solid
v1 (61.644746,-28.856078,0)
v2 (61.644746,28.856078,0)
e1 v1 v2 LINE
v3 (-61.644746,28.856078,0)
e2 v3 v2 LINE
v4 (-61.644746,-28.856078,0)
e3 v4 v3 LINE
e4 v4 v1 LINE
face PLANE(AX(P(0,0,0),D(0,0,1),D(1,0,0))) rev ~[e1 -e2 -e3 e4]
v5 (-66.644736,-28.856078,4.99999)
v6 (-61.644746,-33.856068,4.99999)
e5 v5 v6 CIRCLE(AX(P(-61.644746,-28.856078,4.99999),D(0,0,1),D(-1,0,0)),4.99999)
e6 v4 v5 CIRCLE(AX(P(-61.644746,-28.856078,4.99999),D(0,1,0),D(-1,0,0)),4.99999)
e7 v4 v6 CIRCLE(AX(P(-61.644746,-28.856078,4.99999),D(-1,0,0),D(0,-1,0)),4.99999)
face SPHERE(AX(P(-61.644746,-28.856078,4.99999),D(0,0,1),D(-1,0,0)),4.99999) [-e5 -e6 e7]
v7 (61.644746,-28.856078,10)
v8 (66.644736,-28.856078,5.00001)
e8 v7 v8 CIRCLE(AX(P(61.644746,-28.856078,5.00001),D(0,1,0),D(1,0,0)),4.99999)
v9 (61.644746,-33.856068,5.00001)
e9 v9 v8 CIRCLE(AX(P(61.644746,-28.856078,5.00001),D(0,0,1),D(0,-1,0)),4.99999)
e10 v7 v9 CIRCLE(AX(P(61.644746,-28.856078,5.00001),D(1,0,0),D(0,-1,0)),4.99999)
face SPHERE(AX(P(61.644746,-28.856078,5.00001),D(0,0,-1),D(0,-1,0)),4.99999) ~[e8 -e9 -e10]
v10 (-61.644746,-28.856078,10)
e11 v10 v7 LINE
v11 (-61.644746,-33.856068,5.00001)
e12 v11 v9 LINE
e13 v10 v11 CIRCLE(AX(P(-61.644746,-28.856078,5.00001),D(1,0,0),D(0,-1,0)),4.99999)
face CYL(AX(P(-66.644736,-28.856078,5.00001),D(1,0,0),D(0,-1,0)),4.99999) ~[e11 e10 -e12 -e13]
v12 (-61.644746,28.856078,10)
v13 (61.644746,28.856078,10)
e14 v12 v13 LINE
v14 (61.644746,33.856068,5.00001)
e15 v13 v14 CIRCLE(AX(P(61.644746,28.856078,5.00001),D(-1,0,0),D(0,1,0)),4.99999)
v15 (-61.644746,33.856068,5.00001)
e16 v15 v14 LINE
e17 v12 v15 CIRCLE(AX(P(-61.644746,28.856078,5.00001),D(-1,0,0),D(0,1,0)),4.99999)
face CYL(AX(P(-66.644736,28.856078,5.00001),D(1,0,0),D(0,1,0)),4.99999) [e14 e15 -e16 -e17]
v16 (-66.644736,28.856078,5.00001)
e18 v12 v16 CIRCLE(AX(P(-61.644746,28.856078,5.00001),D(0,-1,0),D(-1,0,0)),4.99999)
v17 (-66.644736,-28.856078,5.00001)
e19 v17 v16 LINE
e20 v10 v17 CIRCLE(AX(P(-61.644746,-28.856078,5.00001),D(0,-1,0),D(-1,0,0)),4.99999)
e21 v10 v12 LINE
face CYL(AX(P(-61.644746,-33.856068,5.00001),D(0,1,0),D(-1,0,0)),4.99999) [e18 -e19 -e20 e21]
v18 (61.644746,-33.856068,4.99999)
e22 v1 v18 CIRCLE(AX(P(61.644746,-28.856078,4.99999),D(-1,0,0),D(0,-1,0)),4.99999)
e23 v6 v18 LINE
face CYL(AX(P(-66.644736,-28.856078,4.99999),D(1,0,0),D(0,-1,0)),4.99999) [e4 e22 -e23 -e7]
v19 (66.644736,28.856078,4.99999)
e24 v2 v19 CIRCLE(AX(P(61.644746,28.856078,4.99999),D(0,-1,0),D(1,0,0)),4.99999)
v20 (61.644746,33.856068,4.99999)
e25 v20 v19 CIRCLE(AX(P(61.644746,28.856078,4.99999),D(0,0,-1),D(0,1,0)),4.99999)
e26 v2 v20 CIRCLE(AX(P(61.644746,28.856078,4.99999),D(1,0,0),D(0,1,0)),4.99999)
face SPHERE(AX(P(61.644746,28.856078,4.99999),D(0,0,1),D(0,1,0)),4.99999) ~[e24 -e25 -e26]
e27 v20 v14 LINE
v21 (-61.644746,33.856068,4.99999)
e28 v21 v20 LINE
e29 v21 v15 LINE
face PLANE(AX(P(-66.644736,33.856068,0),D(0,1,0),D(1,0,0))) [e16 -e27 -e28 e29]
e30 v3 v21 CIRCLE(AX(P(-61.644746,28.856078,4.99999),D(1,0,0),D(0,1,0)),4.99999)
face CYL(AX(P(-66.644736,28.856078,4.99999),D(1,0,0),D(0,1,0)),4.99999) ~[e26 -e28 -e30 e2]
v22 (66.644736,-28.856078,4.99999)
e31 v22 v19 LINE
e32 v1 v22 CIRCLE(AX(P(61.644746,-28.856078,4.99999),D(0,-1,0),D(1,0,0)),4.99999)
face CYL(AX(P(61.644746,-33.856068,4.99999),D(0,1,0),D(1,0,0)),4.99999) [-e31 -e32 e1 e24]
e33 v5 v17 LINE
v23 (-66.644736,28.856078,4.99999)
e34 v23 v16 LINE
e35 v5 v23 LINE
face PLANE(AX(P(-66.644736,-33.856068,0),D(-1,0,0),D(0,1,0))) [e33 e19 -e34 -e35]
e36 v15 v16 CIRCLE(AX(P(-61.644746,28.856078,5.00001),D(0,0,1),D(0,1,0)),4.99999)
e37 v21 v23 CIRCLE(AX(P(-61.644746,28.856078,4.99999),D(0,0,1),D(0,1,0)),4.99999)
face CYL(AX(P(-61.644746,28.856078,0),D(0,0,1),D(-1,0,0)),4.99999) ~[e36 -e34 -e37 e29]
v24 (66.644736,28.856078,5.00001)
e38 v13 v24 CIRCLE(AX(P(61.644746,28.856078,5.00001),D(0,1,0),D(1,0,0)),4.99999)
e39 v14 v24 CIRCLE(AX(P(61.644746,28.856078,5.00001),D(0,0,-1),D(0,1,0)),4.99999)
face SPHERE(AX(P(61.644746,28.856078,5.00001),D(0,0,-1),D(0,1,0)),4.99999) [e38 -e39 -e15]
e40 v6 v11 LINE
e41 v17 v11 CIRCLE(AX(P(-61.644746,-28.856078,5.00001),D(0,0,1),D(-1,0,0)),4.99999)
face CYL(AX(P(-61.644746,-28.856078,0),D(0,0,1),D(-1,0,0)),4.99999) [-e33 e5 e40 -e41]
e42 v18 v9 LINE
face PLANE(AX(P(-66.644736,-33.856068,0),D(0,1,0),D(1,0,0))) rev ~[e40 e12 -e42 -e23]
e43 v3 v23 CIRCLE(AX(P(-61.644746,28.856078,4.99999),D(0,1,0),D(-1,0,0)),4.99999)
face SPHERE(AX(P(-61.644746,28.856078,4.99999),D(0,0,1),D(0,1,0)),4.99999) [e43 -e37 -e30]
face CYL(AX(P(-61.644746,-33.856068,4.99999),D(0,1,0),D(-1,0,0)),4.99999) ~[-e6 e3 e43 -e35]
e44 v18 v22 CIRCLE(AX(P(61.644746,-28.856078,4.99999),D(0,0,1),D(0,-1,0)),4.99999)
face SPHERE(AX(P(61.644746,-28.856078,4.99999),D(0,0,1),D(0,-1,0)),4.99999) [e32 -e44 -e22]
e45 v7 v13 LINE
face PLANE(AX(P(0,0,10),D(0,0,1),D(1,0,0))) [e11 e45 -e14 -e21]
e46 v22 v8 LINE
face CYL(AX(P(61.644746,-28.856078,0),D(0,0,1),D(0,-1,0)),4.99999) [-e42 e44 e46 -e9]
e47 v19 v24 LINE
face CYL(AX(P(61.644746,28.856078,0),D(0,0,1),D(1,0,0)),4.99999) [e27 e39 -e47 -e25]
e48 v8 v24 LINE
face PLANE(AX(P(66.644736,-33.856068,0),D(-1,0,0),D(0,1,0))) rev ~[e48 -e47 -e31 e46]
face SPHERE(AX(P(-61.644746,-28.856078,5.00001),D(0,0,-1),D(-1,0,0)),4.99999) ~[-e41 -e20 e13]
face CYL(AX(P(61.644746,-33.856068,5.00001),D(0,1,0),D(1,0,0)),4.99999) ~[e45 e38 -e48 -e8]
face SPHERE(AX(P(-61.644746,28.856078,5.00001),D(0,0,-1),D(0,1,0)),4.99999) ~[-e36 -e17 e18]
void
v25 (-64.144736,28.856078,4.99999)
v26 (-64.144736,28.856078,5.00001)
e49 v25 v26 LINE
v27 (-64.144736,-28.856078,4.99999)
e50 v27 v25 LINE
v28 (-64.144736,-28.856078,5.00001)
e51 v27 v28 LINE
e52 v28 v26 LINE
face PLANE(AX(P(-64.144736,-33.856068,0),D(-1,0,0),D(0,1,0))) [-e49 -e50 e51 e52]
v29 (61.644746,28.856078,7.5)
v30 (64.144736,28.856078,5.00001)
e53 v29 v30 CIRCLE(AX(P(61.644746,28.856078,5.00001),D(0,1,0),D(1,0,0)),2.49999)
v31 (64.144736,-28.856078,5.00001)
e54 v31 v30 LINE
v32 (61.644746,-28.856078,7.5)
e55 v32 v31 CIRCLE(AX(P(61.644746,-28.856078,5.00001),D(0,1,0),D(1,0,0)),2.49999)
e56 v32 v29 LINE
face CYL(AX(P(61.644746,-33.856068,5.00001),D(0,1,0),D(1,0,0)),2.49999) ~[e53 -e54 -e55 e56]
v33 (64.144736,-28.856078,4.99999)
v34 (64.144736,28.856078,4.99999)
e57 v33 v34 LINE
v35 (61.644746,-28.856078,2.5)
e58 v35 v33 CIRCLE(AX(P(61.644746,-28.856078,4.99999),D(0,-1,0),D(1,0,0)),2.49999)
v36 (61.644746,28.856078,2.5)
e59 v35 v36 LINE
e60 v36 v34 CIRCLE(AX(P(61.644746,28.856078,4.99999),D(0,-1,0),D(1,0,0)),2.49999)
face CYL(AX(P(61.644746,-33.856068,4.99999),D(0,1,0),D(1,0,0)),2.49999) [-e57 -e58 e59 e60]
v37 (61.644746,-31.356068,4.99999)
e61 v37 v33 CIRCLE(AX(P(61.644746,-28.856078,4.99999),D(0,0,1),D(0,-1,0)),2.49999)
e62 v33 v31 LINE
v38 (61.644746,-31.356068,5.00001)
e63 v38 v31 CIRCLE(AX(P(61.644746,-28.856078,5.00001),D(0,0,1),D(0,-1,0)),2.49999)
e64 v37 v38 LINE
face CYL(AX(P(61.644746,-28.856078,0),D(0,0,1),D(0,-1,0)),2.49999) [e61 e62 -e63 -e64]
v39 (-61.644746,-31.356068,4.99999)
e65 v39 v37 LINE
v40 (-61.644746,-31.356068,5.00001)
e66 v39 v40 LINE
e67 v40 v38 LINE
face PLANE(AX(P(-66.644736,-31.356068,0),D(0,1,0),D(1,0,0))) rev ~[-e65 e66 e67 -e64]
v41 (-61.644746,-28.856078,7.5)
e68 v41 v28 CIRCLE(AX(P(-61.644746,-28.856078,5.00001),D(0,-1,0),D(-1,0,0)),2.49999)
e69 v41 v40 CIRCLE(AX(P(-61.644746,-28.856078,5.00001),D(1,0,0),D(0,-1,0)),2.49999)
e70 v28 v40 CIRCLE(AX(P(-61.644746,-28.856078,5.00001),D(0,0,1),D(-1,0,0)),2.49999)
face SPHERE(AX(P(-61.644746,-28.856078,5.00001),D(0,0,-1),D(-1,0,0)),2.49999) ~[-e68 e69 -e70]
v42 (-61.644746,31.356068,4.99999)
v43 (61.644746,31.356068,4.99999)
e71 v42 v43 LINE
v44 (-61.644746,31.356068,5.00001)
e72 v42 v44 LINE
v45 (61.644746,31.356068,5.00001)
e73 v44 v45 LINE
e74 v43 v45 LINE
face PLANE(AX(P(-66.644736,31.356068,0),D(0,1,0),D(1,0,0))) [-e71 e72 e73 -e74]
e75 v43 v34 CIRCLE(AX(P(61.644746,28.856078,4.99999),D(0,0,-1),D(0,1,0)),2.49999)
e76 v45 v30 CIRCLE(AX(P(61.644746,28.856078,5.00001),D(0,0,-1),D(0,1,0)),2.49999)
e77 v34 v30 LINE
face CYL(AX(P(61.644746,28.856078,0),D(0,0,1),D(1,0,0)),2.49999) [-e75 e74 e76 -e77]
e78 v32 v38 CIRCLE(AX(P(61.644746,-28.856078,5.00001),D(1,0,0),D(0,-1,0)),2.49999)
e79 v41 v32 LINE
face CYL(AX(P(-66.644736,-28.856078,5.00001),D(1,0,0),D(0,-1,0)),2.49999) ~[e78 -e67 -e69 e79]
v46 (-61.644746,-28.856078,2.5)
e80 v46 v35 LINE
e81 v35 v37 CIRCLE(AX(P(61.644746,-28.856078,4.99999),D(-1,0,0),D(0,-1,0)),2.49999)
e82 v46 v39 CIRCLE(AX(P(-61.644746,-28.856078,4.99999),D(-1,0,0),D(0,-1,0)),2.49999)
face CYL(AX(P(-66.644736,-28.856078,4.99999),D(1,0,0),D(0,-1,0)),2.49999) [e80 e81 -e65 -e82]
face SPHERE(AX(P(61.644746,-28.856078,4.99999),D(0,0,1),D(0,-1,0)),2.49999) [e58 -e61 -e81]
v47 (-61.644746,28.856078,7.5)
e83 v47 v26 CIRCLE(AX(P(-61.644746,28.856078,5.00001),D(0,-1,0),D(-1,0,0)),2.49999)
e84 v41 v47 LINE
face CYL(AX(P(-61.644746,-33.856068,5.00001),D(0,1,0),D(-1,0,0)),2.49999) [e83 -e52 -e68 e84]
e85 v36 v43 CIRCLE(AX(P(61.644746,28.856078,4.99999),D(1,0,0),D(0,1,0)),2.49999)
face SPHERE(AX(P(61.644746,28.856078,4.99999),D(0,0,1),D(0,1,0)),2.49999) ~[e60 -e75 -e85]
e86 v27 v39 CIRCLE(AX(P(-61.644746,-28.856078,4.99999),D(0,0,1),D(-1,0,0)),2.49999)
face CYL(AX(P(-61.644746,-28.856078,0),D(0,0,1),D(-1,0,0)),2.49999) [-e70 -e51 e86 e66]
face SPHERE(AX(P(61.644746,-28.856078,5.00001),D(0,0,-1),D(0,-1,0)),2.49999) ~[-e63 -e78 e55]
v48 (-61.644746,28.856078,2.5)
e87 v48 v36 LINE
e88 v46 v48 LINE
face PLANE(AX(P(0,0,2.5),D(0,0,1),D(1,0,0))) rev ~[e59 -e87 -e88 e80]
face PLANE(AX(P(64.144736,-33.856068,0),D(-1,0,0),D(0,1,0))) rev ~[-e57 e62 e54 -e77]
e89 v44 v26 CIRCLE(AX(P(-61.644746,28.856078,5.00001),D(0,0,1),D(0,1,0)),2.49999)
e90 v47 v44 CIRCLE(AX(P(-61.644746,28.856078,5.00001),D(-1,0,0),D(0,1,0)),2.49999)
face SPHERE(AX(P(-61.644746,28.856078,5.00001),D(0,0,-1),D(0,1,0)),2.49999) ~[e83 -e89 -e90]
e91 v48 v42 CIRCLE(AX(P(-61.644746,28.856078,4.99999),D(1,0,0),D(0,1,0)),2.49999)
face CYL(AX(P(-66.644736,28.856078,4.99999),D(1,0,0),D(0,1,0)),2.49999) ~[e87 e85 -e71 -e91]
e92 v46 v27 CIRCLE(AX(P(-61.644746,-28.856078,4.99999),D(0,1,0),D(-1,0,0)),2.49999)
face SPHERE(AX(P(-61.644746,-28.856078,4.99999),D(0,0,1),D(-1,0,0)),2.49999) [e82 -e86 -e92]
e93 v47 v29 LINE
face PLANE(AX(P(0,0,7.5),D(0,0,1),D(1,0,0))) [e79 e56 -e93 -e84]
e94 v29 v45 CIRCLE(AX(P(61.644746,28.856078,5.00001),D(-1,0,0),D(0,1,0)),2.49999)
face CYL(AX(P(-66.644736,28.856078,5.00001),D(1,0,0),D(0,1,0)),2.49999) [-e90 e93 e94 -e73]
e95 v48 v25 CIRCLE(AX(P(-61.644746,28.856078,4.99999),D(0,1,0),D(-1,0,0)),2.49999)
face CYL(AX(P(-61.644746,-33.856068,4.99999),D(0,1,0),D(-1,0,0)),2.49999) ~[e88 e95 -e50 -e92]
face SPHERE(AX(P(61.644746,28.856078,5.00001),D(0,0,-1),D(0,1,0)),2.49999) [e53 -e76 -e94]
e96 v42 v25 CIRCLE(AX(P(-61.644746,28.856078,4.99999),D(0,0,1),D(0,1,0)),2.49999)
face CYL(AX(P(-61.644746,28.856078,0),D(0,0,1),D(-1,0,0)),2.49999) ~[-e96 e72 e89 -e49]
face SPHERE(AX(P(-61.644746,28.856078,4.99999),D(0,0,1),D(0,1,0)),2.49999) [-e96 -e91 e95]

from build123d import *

# Parameters (mm, degrees)
F0_W     = 133.2894712687
F0_H     = 67.712135613
F1_DEPTH = 10
F2_R     = 4.99999
F3_T     = -2.5


# Not quite as in the source:
# - a fillet or chamfer is up to 0.001 mm smaller than in the source, because OpenCascade refuses the exact size


with BuildPart() as f1:
    # F0 (on Top) → F1 (new body)
    with BuildSketch(Plane.XY):
        Rectangle(F0_W, F0_H)
    extrude(amount=F1_DEPTH)

    # F2 (radius 5 in the source; OpenCascade refuses exactly that, so slightly less here)
    f2_edges = [f1.edges().sort_by_distance(p)[0] for p in [
        (66.644736, 33.856068, 5),
        (-66.644736, 33.856068, 5),
        (0, 33.856068, 0),
        (0, 33.856068, 10),
        (-66.644736, -33.856068, 5),
        (-66.644736, 0, 0),
        (-66.644736, 0, 10),
        (66.644736, -33.856068, 5),
        (0, -33.856068, 0),
        (0, -33.856068, 10),
        (66.644736, 0, 0),
        (66.644736, 0, 10),
    ]]
    fillet(f2_edges, radius=F2_R)

    # F3 (hollow: no face is removed)
    offset(amount=F3_T, mode=Mode.SUBTRACT)


solid = f1.part
